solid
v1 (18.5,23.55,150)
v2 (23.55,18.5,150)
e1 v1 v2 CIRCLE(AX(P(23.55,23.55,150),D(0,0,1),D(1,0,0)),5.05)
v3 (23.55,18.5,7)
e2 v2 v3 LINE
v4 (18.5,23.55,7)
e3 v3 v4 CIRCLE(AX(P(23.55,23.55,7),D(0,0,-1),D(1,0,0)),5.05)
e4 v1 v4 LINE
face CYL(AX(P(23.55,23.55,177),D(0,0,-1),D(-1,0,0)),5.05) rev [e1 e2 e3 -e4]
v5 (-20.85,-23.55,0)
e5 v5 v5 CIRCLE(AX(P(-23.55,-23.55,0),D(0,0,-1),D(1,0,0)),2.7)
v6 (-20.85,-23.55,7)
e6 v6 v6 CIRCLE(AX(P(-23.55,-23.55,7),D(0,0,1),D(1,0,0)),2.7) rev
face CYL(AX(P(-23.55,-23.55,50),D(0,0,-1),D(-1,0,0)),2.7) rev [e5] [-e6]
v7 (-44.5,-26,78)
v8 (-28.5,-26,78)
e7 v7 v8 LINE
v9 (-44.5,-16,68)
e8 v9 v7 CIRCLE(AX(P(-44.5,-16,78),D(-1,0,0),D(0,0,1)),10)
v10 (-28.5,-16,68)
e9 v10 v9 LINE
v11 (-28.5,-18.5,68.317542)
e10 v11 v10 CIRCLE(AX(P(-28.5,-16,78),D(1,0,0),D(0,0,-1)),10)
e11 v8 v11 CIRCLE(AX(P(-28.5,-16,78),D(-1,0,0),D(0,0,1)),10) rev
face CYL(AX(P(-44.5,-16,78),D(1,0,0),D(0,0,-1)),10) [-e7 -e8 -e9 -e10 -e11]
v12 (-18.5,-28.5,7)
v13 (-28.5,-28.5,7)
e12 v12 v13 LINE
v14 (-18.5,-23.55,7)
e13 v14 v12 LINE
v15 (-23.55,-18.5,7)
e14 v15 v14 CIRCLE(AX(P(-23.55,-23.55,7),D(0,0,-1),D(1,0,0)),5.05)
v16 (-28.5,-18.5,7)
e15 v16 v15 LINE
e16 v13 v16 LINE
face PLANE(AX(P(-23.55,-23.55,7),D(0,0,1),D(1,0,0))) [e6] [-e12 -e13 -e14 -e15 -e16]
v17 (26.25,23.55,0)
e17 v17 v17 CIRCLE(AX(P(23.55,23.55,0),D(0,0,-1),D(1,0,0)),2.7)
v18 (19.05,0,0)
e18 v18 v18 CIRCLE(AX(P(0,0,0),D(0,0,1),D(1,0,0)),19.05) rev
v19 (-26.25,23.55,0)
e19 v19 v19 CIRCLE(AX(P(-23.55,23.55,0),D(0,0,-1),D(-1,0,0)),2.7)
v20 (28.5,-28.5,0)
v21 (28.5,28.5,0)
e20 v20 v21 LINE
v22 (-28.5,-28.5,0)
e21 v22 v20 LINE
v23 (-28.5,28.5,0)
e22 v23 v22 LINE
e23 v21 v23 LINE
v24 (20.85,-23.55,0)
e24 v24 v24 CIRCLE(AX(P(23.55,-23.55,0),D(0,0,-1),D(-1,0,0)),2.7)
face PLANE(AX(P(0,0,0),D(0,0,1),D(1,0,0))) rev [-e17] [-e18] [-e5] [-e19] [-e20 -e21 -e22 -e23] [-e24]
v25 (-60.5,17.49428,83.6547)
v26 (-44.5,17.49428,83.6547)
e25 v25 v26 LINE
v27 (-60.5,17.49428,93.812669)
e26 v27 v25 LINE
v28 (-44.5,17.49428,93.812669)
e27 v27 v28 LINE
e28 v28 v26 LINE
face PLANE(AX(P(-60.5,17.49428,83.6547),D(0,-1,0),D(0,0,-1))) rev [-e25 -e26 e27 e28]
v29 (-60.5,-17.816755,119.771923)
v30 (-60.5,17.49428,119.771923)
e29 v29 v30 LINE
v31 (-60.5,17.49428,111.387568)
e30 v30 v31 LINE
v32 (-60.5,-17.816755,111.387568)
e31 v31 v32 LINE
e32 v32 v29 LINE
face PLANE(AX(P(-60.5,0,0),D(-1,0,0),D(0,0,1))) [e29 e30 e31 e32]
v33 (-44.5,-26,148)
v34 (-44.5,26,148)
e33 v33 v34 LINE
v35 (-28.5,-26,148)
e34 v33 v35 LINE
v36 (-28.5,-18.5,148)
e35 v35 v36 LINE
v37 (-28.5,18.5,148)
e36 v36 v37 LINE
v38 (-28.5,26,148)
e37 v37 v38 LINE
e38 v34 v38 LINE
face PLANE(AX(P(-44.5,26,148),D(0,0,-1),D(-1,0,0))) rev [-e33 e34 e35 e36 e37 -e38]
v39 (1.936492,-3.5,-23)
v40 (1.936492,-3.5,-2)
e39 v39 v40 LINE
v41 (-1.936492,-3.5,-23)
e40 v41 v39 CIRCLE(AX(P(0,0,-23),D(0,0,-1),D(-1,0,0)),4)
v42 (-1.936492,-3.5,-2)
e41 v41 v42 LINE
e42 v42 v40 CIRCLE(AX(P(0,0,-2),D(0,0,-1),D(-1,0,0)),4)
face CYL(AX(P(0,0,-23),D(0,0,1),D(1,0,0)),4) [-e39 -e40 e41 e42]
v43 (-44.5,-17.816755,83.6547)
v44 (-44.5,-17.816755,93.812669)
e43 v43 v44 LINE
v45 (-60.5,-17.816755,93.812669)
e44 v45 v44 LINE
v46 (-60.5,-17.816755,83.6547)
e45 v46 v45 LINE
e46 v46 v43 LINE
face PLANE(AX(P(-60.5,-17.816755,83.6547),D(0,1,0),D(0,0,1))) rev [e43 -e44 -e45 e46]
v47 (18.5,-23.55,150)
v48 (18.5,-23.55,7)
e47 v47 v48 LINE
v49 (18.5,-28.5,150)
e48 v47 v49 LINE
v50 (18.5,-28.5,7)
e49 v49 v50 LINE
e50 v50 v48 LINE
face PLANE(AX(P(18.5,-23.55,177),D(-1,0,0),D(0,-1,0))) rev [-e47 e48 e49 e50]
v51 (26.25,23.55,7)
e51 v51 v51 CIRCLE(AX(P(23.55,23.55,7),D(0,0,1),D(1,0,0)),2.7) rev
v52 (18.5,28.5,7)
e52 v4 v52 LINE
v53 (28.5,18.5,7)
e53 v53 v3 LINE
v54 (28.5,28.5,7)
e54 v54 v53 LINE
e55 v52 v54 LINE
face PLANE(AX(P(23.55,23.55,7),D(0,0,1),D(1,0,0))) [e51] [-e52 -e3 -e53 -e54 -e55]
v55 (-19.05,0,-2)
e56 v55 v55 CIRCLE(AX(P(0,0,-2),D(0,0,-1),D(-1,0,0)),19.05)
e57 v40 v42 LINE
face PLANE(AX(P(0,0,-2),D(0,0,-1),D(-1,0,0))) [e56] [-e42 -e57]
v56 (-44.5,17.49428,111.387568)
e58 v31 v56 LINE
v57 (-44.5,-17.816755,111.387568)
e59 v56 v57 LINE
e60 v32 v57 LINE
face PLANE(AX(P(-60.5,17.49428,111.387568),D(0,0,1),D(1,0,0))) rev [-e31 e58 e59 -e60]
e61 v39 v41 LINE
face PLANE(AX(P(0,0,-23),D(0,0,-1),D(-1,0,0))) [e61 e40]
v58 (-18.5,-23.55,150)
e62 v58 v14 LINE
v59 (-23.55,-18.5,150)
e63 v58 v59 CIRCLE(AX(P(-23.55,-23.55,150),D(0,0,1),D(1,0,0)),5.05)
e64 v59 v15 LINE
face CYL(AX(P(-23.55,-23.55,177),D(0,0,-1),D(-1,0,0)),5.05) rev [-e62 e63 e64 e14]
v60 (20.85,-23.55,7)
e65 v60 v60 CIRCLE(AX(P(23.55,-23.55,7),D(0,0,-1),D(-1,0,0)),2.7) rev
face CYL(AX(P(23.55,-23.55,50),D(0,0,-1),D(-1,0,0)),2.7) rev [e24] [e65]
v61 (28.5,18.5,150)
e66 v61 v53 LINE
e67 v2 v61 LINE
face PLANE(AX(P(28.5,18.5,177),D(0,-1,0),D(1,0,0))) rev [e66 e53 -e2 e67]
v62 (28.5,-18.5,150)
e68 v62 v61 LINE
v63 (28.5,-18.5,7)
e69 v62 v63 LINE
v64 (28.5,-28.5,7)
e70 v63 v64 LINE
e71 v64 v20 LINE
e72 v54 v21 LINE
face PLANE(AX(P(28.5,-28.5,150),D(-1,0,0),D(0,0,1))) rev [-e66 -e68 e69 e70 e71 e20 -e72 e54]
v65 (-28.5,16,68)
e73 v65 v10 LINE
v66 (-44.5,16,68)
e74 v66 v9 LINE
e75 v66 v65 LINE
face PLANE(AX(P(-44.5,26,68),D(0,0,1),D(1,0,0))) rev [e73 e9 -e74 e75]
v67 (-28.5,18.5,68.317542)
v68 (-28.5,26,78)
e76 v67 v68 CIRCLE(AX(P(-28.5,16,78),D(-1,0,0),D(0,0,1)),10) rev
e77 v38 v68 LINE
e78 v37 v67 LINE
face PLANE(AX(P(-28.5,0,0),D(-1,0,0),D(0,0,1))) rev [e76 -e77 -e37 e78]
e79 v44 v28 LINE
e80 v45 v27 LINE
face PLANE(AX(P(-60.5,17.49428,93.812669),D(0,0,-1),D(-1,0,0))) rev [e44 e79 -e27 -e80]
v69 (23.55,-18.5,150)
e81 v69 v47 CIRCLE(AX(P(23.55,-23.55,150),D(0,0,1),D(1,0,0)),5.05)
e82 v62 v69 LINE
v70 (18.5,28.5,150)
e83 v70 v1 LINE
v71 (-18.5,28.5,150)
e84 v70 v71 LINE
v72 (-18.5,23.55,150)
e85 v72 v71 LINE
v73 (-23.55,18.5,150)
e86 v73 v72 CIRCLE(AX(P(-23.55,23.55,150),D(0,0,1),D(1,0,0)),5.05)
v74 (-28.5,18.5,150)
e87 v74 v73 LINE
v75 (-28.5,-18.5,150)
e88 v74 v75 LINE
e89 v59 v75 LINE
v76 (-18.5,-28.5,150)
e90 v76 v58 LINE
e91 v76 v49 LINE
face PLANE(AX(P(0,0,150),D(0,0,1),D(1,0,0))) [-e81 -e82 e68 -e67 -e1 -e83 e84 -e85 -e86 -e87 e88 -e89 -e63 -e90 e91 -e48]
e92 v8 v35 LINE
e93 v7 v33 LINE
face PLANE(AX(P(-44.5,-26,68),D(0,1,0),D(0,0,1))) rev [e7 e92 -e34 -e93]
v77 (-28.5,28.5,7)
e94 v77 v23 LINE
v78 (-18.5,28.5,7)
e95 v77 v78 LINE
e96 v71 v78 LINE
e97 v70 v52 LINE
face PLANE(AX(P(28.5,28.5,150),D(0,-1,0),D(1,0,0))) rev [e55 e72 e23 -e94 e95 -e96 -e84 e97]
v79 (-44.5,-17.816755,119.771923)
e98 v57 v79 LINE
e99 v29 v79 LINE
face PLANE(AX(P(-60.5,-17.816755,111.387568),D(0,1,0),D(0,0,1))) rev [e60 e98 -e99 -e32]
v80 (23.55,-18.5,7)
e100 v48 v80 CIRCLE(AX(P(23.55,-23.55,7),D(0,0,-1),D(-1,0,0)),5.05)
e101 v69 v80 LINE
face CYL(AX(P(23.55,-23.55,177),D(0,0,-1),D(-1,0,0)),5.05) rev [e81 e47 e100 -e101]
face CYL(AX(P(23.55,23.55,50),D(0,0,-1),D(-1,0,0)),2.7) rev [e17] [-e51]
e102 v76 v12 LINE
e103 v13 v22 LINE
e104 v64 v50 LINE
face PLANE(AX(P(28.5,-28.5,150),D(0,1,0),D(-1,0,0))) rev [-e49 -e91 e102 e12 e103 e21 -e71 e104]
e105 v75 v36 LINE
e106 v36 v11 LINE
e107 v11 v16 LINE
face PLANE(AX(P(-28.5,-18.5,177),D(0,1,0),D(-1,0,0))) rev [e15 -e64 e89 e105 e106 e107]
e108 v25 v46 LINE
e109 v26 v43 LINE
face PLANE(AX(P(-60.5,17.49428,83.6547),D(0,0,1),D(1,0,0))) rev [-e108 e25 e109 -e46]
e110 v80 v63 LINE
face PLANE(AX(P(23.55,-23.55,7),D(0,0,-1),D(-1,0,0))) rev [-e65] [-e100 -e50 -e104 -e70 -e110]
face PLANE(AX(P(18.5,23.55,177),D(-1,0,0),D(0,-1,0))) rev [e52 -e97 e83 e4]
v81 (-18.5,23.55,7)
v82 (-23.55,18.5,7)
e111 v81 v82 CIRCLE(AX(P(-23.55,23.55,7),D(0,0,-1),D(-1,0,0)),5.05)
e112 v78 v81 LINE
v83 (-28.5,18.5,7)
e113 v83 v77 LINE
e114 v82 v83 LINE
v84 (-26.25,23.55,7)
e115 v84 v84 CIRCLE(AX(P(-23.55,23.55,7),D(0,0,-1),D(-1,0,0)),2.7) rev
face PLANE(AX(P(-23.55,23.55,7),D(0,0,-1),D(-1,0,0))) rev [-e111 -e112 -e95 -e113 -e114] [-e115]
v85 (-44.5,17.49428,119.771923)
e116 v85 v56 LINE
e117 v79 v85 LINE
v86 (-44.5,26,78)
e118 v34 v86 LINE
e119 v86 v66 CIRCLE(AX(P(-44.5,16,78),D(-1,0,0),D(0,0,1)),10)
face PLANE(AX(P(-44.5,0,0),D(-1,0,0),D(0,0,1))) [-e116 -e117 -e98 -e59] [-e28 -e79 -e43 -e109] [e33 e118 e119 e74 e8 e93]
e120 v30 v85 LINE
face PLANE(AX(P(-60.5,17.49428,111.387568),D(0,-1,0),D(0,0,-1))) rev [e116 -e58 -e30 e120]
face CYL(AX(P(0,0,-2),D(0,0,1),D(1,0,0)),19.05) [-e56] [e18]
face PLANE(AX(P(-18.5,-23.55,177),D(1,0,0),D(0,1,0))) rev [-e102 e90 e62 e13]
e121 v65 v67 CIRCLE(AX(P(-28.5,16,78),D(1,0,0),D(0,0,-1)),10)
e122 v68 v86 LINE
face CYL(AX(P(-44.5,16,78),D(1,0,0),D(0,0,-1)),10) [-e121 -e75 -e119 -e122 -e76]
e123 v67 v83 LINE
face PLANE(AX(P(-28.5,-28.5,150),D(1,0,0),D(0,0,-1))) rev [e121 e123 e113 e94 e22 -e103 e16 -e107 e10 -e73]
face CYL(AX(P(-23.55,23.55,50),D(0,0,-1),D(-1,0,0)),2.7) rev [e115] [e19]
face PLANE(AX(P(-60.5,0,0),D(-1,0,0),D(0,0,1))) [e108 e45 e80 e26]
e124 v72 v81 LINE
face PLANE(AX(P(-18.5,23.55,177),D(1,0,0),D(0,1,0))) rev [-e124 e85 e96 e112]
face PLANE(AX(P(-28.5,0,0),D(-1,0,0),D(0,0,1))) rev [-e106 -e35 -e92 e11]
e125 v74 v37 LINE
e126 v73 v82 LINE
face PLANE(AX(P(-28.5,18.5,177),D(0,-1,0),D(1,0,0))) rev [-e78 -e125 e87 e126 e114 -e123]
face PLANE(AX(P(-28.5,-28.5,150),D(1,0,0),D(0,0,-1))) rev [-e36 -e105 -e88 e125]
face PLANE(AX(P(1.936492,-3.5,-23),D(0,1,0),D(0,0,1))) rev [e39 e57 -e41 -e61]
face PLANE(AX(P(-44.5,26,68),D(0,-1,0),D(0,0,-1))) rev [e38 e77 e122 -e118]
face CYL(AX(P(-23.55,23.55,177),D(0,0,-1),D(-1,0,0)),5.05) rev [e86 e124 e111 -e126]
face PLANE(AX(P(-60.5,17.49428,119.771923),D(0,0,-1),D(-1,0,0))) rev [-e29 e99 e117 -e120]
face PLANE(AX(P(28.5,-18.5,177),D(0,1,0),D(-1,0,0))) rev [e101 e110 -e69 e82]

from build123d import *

# Parameters (mm, degrees)
SKIZZE1_W                       = 57
SKIZZE1_H                       = 57
AUFSATZ_LINEAR_AUSTRAGEN1_DEPTH = 150
SKIZZE2_R                       = 19.05
AUFSATZ_LINEAR_AUSTRAGEN2_DEPTH = 2
AUFSATZ_LINEAR_AUSTRAGEN3_DEPTH = 21
SKIZZE4_R                       = 2.7
SCHNITT_LINEAR_AUSTRAGEN1_DEPTH = 50
SCHNITT_LINEAR_START            = -7
SCHNITT_LINEAR_AUSTRAGEN2_DEPTH = 170
SKIZZE6_W                       = 80
SKIZZE6_H                       = 52
AUFSATZ_LINEAR_AUSTRAGEN4_DEPTH = 16
VERRUNDUNG1_R                   = 10
SKIZZE7_W                       = 10.157968888
SKIZZE7_H                       = 35.311034703
SKIZZE7_W_2                     = 8.384355272
AUFSATZ_LINEAR_AUSTRAGEN5_DEPTH = 16


with BuildPart() as part:
    # Skizze1 → Aufsatz-Linear austragen1 (new body)
    with BuildSketch(Plane.XY):
        Rectangle(SKIZZE1_W, SKIZZE1_H)
    extrude(amount=AUFSATZ_LINEAR_AUSTRAGEN1_DEPTH)

    # Skizze2 → Aufsatz-Linear austragen2 (add)
    with BuildSketch(Plane(origin=(0, 0, 0), x_dir=(-1, 0, 0), z_dir=(0, 0, -1))):
        with Locations(Location((0, 0, 0), (0, 0, 180))):
            Circle(SKIZZE2_R)
    extrude(amount=AUFSATZ_LINEAR_AUSTRAGEN2_DEPTH)

    # Skizze3 → Aufsatz-Linear austragen3 (add)
    with BuildSketch(Plane(origin=(0, 0, -2), x_dir=(-1, 0, 0), z_dir=(0, 0, -1))):
        with BuildLine():
            Line((-1.936491673, -3.5), (1.936491673, -3.5))
            ThreePointArc((1.936491673, -3.5), (0, 4), (-1.936491673, -3.5))
        make_face()
    extrude(amount=AUFSATZ_LINEAR_AUSTRAGEN3_DEPTH)

    # Skizze4 → Schnitt-Linear austragen1 (cut)
    with BuildSketch(Plane(origin=(0, 0, 0), x_dir=(-1, 0, 0), z_dir=(0, 0, -1))):
        with Locations((23.55, 23.55)):
            Circle(SKIZZE4_R)
        with Locations(Location((-23.55, 23.55, 0), (0, 0, 180))):
            Circle(SKIZZE4_R)
        with Locations(Location((23.55, -23.55, 0), (0, 0, 180))):
            Circle(SKIZZE4_R)
        with Locations((-23.55, -23.55)):
            Circle(SKIZZE4_R)
    extrude(amount=-SCHNITT_LINEAR_AUSTRAGEN1_DEPTH, mode=Mode.SUBTRACT)

    # Skizze5 → Schnitt-Linear austragen2 (cut)
    with BuildSketch(Plane(origin=(0, 0, 0), x_dir=(-1, 0, 0), z_dir=(0, 0, -1)).offset(SCHNITT_LINEAR_START)):
        with BuildLine():
            Line((18.5, 23.55), (18.5, 28.5))
            Line((18.5, 28.5), (28.5, 28.5))
            Line((28.5, 28.5), (28.5, 18.5))
            Line((28.5, 18.5), (23.55, 18.5))
            ThreePointArc((23.55, 18.5), (19.979110755, 19.979110755), (18.5, 23.55))
        make_face()
        with BuildLine():
            Line((-28.5, 28.5), (-28.5, 18.5))
            Line((-28.5, 18.5), (-23.55, 18.5))
            ThreePointArc((-23.55, 18.5), (-19.979110755, 19.979110755), (-18.5, 23.55))
            Line((-18.5, 23.55), (-18.5, 28.5))
            Line((-18.5, 28.5), (-28.5, 28.5))
        make_face()
        with BuildLine():
            Line((28.5, -18.5), (23.55, -18.5))
            ThreePointArc((23.55, -18.5), (19.979110755, -19.979110755), (18.5, -23.55))
            Line((18.5, -23.55), (18.5, -28.5))
            Line((18.5, -28.5), (28.5, -28.5))
            Line((28.5, -28.5), (28.5, -18.5))
        make_face()
        with BuildLine():
            Line((-28.5, -18.5), (-23.55, -18.5))
            ThreePointArc((-23.55, -18.5), (-19.979110755, -19.979110755), (-18.5, -23.55))
            Line((-18.5, -23.55), (-18.5, -28.5))
            Line((-18.5, -28.5), (-28.5, -28.5))
            Line((-28.5, -28.5), (-28.5, -18.5))
        make_face()
    extrude(amount=-SCHNITT_LINEAR_AUSTRAGEN2_DEPTH, mode=Mode.SUBTRACT)

    # Skizze6 → Aufsatz-Linear austragen4 (add)
    with BuildSketch(Plane.ZY.offset(28.5)):
        with Locations((108, 0)):
            Rectangle(SKIZZE6_W, SKIZZE6_H)
    extrude(amount=AUFSATZ_LINEAR_AUSTRAGEN4_DEPTH)

    # Verrundung1
    # the kernel refuses this fillet: 10 mm, written as the material it takes off along each edge
    with BuildSketch(Plane(origin=(-28.5, 26, 68), x_dir=(0, -1, 0), z_dir=(-1, 0, 0))) as verrundung1_piece_1:
        with BuildLine():
            CenterArc((VERRUNDUNG1_R, VERRUNDUNG1_R), VERRUNDUNG1_R, 180, 90)
            Line((0, VERRUNDUNG1_R), (0, 0))
            Line((0, 0), (VERRUNDUNG1_R, 0))
        make_face()
    extrude(amount=41, mode=Mode.SUBTRACT)
    with BuildSketch(Plane(origin=(-28.5, -26, 68), x_dir=(0, 1, 0), z_dir=(-1, 0, 0))) as verrundung1_piece_2:
        with BuildLine():
            CenterArc((VERRUNDUNG1_R, -VERRUNDUNG1_R), VERRUNDUNG1_R, 90, 90)
            Line((0, -VERRUNDUNG1_R), (0, 0))
            Line((0, 0), (VERRUNDUNG1_R, 0))
        make_face()
    extrude(amount=41, mode=Mode.SUBTRACT)

    # Skizze7 → Aufsatz-Linear austragen5 (add)
    with BuildSketch(Plane.ZY.offset(44.5)):
        with Locations((88.733684617, -0.161237601)):
            Rectangle(SKIZZE7_W, SKIZZE7_H)
        with Locations((115.579745248, -0.161237601)):
            Rectangle(SKIZZE7_W_2, SKIZZE7_H)
    extrude(amount=AUFSATZ_LINEAR_AUSTRAGEN5_DEPTH)


solid = part.part
